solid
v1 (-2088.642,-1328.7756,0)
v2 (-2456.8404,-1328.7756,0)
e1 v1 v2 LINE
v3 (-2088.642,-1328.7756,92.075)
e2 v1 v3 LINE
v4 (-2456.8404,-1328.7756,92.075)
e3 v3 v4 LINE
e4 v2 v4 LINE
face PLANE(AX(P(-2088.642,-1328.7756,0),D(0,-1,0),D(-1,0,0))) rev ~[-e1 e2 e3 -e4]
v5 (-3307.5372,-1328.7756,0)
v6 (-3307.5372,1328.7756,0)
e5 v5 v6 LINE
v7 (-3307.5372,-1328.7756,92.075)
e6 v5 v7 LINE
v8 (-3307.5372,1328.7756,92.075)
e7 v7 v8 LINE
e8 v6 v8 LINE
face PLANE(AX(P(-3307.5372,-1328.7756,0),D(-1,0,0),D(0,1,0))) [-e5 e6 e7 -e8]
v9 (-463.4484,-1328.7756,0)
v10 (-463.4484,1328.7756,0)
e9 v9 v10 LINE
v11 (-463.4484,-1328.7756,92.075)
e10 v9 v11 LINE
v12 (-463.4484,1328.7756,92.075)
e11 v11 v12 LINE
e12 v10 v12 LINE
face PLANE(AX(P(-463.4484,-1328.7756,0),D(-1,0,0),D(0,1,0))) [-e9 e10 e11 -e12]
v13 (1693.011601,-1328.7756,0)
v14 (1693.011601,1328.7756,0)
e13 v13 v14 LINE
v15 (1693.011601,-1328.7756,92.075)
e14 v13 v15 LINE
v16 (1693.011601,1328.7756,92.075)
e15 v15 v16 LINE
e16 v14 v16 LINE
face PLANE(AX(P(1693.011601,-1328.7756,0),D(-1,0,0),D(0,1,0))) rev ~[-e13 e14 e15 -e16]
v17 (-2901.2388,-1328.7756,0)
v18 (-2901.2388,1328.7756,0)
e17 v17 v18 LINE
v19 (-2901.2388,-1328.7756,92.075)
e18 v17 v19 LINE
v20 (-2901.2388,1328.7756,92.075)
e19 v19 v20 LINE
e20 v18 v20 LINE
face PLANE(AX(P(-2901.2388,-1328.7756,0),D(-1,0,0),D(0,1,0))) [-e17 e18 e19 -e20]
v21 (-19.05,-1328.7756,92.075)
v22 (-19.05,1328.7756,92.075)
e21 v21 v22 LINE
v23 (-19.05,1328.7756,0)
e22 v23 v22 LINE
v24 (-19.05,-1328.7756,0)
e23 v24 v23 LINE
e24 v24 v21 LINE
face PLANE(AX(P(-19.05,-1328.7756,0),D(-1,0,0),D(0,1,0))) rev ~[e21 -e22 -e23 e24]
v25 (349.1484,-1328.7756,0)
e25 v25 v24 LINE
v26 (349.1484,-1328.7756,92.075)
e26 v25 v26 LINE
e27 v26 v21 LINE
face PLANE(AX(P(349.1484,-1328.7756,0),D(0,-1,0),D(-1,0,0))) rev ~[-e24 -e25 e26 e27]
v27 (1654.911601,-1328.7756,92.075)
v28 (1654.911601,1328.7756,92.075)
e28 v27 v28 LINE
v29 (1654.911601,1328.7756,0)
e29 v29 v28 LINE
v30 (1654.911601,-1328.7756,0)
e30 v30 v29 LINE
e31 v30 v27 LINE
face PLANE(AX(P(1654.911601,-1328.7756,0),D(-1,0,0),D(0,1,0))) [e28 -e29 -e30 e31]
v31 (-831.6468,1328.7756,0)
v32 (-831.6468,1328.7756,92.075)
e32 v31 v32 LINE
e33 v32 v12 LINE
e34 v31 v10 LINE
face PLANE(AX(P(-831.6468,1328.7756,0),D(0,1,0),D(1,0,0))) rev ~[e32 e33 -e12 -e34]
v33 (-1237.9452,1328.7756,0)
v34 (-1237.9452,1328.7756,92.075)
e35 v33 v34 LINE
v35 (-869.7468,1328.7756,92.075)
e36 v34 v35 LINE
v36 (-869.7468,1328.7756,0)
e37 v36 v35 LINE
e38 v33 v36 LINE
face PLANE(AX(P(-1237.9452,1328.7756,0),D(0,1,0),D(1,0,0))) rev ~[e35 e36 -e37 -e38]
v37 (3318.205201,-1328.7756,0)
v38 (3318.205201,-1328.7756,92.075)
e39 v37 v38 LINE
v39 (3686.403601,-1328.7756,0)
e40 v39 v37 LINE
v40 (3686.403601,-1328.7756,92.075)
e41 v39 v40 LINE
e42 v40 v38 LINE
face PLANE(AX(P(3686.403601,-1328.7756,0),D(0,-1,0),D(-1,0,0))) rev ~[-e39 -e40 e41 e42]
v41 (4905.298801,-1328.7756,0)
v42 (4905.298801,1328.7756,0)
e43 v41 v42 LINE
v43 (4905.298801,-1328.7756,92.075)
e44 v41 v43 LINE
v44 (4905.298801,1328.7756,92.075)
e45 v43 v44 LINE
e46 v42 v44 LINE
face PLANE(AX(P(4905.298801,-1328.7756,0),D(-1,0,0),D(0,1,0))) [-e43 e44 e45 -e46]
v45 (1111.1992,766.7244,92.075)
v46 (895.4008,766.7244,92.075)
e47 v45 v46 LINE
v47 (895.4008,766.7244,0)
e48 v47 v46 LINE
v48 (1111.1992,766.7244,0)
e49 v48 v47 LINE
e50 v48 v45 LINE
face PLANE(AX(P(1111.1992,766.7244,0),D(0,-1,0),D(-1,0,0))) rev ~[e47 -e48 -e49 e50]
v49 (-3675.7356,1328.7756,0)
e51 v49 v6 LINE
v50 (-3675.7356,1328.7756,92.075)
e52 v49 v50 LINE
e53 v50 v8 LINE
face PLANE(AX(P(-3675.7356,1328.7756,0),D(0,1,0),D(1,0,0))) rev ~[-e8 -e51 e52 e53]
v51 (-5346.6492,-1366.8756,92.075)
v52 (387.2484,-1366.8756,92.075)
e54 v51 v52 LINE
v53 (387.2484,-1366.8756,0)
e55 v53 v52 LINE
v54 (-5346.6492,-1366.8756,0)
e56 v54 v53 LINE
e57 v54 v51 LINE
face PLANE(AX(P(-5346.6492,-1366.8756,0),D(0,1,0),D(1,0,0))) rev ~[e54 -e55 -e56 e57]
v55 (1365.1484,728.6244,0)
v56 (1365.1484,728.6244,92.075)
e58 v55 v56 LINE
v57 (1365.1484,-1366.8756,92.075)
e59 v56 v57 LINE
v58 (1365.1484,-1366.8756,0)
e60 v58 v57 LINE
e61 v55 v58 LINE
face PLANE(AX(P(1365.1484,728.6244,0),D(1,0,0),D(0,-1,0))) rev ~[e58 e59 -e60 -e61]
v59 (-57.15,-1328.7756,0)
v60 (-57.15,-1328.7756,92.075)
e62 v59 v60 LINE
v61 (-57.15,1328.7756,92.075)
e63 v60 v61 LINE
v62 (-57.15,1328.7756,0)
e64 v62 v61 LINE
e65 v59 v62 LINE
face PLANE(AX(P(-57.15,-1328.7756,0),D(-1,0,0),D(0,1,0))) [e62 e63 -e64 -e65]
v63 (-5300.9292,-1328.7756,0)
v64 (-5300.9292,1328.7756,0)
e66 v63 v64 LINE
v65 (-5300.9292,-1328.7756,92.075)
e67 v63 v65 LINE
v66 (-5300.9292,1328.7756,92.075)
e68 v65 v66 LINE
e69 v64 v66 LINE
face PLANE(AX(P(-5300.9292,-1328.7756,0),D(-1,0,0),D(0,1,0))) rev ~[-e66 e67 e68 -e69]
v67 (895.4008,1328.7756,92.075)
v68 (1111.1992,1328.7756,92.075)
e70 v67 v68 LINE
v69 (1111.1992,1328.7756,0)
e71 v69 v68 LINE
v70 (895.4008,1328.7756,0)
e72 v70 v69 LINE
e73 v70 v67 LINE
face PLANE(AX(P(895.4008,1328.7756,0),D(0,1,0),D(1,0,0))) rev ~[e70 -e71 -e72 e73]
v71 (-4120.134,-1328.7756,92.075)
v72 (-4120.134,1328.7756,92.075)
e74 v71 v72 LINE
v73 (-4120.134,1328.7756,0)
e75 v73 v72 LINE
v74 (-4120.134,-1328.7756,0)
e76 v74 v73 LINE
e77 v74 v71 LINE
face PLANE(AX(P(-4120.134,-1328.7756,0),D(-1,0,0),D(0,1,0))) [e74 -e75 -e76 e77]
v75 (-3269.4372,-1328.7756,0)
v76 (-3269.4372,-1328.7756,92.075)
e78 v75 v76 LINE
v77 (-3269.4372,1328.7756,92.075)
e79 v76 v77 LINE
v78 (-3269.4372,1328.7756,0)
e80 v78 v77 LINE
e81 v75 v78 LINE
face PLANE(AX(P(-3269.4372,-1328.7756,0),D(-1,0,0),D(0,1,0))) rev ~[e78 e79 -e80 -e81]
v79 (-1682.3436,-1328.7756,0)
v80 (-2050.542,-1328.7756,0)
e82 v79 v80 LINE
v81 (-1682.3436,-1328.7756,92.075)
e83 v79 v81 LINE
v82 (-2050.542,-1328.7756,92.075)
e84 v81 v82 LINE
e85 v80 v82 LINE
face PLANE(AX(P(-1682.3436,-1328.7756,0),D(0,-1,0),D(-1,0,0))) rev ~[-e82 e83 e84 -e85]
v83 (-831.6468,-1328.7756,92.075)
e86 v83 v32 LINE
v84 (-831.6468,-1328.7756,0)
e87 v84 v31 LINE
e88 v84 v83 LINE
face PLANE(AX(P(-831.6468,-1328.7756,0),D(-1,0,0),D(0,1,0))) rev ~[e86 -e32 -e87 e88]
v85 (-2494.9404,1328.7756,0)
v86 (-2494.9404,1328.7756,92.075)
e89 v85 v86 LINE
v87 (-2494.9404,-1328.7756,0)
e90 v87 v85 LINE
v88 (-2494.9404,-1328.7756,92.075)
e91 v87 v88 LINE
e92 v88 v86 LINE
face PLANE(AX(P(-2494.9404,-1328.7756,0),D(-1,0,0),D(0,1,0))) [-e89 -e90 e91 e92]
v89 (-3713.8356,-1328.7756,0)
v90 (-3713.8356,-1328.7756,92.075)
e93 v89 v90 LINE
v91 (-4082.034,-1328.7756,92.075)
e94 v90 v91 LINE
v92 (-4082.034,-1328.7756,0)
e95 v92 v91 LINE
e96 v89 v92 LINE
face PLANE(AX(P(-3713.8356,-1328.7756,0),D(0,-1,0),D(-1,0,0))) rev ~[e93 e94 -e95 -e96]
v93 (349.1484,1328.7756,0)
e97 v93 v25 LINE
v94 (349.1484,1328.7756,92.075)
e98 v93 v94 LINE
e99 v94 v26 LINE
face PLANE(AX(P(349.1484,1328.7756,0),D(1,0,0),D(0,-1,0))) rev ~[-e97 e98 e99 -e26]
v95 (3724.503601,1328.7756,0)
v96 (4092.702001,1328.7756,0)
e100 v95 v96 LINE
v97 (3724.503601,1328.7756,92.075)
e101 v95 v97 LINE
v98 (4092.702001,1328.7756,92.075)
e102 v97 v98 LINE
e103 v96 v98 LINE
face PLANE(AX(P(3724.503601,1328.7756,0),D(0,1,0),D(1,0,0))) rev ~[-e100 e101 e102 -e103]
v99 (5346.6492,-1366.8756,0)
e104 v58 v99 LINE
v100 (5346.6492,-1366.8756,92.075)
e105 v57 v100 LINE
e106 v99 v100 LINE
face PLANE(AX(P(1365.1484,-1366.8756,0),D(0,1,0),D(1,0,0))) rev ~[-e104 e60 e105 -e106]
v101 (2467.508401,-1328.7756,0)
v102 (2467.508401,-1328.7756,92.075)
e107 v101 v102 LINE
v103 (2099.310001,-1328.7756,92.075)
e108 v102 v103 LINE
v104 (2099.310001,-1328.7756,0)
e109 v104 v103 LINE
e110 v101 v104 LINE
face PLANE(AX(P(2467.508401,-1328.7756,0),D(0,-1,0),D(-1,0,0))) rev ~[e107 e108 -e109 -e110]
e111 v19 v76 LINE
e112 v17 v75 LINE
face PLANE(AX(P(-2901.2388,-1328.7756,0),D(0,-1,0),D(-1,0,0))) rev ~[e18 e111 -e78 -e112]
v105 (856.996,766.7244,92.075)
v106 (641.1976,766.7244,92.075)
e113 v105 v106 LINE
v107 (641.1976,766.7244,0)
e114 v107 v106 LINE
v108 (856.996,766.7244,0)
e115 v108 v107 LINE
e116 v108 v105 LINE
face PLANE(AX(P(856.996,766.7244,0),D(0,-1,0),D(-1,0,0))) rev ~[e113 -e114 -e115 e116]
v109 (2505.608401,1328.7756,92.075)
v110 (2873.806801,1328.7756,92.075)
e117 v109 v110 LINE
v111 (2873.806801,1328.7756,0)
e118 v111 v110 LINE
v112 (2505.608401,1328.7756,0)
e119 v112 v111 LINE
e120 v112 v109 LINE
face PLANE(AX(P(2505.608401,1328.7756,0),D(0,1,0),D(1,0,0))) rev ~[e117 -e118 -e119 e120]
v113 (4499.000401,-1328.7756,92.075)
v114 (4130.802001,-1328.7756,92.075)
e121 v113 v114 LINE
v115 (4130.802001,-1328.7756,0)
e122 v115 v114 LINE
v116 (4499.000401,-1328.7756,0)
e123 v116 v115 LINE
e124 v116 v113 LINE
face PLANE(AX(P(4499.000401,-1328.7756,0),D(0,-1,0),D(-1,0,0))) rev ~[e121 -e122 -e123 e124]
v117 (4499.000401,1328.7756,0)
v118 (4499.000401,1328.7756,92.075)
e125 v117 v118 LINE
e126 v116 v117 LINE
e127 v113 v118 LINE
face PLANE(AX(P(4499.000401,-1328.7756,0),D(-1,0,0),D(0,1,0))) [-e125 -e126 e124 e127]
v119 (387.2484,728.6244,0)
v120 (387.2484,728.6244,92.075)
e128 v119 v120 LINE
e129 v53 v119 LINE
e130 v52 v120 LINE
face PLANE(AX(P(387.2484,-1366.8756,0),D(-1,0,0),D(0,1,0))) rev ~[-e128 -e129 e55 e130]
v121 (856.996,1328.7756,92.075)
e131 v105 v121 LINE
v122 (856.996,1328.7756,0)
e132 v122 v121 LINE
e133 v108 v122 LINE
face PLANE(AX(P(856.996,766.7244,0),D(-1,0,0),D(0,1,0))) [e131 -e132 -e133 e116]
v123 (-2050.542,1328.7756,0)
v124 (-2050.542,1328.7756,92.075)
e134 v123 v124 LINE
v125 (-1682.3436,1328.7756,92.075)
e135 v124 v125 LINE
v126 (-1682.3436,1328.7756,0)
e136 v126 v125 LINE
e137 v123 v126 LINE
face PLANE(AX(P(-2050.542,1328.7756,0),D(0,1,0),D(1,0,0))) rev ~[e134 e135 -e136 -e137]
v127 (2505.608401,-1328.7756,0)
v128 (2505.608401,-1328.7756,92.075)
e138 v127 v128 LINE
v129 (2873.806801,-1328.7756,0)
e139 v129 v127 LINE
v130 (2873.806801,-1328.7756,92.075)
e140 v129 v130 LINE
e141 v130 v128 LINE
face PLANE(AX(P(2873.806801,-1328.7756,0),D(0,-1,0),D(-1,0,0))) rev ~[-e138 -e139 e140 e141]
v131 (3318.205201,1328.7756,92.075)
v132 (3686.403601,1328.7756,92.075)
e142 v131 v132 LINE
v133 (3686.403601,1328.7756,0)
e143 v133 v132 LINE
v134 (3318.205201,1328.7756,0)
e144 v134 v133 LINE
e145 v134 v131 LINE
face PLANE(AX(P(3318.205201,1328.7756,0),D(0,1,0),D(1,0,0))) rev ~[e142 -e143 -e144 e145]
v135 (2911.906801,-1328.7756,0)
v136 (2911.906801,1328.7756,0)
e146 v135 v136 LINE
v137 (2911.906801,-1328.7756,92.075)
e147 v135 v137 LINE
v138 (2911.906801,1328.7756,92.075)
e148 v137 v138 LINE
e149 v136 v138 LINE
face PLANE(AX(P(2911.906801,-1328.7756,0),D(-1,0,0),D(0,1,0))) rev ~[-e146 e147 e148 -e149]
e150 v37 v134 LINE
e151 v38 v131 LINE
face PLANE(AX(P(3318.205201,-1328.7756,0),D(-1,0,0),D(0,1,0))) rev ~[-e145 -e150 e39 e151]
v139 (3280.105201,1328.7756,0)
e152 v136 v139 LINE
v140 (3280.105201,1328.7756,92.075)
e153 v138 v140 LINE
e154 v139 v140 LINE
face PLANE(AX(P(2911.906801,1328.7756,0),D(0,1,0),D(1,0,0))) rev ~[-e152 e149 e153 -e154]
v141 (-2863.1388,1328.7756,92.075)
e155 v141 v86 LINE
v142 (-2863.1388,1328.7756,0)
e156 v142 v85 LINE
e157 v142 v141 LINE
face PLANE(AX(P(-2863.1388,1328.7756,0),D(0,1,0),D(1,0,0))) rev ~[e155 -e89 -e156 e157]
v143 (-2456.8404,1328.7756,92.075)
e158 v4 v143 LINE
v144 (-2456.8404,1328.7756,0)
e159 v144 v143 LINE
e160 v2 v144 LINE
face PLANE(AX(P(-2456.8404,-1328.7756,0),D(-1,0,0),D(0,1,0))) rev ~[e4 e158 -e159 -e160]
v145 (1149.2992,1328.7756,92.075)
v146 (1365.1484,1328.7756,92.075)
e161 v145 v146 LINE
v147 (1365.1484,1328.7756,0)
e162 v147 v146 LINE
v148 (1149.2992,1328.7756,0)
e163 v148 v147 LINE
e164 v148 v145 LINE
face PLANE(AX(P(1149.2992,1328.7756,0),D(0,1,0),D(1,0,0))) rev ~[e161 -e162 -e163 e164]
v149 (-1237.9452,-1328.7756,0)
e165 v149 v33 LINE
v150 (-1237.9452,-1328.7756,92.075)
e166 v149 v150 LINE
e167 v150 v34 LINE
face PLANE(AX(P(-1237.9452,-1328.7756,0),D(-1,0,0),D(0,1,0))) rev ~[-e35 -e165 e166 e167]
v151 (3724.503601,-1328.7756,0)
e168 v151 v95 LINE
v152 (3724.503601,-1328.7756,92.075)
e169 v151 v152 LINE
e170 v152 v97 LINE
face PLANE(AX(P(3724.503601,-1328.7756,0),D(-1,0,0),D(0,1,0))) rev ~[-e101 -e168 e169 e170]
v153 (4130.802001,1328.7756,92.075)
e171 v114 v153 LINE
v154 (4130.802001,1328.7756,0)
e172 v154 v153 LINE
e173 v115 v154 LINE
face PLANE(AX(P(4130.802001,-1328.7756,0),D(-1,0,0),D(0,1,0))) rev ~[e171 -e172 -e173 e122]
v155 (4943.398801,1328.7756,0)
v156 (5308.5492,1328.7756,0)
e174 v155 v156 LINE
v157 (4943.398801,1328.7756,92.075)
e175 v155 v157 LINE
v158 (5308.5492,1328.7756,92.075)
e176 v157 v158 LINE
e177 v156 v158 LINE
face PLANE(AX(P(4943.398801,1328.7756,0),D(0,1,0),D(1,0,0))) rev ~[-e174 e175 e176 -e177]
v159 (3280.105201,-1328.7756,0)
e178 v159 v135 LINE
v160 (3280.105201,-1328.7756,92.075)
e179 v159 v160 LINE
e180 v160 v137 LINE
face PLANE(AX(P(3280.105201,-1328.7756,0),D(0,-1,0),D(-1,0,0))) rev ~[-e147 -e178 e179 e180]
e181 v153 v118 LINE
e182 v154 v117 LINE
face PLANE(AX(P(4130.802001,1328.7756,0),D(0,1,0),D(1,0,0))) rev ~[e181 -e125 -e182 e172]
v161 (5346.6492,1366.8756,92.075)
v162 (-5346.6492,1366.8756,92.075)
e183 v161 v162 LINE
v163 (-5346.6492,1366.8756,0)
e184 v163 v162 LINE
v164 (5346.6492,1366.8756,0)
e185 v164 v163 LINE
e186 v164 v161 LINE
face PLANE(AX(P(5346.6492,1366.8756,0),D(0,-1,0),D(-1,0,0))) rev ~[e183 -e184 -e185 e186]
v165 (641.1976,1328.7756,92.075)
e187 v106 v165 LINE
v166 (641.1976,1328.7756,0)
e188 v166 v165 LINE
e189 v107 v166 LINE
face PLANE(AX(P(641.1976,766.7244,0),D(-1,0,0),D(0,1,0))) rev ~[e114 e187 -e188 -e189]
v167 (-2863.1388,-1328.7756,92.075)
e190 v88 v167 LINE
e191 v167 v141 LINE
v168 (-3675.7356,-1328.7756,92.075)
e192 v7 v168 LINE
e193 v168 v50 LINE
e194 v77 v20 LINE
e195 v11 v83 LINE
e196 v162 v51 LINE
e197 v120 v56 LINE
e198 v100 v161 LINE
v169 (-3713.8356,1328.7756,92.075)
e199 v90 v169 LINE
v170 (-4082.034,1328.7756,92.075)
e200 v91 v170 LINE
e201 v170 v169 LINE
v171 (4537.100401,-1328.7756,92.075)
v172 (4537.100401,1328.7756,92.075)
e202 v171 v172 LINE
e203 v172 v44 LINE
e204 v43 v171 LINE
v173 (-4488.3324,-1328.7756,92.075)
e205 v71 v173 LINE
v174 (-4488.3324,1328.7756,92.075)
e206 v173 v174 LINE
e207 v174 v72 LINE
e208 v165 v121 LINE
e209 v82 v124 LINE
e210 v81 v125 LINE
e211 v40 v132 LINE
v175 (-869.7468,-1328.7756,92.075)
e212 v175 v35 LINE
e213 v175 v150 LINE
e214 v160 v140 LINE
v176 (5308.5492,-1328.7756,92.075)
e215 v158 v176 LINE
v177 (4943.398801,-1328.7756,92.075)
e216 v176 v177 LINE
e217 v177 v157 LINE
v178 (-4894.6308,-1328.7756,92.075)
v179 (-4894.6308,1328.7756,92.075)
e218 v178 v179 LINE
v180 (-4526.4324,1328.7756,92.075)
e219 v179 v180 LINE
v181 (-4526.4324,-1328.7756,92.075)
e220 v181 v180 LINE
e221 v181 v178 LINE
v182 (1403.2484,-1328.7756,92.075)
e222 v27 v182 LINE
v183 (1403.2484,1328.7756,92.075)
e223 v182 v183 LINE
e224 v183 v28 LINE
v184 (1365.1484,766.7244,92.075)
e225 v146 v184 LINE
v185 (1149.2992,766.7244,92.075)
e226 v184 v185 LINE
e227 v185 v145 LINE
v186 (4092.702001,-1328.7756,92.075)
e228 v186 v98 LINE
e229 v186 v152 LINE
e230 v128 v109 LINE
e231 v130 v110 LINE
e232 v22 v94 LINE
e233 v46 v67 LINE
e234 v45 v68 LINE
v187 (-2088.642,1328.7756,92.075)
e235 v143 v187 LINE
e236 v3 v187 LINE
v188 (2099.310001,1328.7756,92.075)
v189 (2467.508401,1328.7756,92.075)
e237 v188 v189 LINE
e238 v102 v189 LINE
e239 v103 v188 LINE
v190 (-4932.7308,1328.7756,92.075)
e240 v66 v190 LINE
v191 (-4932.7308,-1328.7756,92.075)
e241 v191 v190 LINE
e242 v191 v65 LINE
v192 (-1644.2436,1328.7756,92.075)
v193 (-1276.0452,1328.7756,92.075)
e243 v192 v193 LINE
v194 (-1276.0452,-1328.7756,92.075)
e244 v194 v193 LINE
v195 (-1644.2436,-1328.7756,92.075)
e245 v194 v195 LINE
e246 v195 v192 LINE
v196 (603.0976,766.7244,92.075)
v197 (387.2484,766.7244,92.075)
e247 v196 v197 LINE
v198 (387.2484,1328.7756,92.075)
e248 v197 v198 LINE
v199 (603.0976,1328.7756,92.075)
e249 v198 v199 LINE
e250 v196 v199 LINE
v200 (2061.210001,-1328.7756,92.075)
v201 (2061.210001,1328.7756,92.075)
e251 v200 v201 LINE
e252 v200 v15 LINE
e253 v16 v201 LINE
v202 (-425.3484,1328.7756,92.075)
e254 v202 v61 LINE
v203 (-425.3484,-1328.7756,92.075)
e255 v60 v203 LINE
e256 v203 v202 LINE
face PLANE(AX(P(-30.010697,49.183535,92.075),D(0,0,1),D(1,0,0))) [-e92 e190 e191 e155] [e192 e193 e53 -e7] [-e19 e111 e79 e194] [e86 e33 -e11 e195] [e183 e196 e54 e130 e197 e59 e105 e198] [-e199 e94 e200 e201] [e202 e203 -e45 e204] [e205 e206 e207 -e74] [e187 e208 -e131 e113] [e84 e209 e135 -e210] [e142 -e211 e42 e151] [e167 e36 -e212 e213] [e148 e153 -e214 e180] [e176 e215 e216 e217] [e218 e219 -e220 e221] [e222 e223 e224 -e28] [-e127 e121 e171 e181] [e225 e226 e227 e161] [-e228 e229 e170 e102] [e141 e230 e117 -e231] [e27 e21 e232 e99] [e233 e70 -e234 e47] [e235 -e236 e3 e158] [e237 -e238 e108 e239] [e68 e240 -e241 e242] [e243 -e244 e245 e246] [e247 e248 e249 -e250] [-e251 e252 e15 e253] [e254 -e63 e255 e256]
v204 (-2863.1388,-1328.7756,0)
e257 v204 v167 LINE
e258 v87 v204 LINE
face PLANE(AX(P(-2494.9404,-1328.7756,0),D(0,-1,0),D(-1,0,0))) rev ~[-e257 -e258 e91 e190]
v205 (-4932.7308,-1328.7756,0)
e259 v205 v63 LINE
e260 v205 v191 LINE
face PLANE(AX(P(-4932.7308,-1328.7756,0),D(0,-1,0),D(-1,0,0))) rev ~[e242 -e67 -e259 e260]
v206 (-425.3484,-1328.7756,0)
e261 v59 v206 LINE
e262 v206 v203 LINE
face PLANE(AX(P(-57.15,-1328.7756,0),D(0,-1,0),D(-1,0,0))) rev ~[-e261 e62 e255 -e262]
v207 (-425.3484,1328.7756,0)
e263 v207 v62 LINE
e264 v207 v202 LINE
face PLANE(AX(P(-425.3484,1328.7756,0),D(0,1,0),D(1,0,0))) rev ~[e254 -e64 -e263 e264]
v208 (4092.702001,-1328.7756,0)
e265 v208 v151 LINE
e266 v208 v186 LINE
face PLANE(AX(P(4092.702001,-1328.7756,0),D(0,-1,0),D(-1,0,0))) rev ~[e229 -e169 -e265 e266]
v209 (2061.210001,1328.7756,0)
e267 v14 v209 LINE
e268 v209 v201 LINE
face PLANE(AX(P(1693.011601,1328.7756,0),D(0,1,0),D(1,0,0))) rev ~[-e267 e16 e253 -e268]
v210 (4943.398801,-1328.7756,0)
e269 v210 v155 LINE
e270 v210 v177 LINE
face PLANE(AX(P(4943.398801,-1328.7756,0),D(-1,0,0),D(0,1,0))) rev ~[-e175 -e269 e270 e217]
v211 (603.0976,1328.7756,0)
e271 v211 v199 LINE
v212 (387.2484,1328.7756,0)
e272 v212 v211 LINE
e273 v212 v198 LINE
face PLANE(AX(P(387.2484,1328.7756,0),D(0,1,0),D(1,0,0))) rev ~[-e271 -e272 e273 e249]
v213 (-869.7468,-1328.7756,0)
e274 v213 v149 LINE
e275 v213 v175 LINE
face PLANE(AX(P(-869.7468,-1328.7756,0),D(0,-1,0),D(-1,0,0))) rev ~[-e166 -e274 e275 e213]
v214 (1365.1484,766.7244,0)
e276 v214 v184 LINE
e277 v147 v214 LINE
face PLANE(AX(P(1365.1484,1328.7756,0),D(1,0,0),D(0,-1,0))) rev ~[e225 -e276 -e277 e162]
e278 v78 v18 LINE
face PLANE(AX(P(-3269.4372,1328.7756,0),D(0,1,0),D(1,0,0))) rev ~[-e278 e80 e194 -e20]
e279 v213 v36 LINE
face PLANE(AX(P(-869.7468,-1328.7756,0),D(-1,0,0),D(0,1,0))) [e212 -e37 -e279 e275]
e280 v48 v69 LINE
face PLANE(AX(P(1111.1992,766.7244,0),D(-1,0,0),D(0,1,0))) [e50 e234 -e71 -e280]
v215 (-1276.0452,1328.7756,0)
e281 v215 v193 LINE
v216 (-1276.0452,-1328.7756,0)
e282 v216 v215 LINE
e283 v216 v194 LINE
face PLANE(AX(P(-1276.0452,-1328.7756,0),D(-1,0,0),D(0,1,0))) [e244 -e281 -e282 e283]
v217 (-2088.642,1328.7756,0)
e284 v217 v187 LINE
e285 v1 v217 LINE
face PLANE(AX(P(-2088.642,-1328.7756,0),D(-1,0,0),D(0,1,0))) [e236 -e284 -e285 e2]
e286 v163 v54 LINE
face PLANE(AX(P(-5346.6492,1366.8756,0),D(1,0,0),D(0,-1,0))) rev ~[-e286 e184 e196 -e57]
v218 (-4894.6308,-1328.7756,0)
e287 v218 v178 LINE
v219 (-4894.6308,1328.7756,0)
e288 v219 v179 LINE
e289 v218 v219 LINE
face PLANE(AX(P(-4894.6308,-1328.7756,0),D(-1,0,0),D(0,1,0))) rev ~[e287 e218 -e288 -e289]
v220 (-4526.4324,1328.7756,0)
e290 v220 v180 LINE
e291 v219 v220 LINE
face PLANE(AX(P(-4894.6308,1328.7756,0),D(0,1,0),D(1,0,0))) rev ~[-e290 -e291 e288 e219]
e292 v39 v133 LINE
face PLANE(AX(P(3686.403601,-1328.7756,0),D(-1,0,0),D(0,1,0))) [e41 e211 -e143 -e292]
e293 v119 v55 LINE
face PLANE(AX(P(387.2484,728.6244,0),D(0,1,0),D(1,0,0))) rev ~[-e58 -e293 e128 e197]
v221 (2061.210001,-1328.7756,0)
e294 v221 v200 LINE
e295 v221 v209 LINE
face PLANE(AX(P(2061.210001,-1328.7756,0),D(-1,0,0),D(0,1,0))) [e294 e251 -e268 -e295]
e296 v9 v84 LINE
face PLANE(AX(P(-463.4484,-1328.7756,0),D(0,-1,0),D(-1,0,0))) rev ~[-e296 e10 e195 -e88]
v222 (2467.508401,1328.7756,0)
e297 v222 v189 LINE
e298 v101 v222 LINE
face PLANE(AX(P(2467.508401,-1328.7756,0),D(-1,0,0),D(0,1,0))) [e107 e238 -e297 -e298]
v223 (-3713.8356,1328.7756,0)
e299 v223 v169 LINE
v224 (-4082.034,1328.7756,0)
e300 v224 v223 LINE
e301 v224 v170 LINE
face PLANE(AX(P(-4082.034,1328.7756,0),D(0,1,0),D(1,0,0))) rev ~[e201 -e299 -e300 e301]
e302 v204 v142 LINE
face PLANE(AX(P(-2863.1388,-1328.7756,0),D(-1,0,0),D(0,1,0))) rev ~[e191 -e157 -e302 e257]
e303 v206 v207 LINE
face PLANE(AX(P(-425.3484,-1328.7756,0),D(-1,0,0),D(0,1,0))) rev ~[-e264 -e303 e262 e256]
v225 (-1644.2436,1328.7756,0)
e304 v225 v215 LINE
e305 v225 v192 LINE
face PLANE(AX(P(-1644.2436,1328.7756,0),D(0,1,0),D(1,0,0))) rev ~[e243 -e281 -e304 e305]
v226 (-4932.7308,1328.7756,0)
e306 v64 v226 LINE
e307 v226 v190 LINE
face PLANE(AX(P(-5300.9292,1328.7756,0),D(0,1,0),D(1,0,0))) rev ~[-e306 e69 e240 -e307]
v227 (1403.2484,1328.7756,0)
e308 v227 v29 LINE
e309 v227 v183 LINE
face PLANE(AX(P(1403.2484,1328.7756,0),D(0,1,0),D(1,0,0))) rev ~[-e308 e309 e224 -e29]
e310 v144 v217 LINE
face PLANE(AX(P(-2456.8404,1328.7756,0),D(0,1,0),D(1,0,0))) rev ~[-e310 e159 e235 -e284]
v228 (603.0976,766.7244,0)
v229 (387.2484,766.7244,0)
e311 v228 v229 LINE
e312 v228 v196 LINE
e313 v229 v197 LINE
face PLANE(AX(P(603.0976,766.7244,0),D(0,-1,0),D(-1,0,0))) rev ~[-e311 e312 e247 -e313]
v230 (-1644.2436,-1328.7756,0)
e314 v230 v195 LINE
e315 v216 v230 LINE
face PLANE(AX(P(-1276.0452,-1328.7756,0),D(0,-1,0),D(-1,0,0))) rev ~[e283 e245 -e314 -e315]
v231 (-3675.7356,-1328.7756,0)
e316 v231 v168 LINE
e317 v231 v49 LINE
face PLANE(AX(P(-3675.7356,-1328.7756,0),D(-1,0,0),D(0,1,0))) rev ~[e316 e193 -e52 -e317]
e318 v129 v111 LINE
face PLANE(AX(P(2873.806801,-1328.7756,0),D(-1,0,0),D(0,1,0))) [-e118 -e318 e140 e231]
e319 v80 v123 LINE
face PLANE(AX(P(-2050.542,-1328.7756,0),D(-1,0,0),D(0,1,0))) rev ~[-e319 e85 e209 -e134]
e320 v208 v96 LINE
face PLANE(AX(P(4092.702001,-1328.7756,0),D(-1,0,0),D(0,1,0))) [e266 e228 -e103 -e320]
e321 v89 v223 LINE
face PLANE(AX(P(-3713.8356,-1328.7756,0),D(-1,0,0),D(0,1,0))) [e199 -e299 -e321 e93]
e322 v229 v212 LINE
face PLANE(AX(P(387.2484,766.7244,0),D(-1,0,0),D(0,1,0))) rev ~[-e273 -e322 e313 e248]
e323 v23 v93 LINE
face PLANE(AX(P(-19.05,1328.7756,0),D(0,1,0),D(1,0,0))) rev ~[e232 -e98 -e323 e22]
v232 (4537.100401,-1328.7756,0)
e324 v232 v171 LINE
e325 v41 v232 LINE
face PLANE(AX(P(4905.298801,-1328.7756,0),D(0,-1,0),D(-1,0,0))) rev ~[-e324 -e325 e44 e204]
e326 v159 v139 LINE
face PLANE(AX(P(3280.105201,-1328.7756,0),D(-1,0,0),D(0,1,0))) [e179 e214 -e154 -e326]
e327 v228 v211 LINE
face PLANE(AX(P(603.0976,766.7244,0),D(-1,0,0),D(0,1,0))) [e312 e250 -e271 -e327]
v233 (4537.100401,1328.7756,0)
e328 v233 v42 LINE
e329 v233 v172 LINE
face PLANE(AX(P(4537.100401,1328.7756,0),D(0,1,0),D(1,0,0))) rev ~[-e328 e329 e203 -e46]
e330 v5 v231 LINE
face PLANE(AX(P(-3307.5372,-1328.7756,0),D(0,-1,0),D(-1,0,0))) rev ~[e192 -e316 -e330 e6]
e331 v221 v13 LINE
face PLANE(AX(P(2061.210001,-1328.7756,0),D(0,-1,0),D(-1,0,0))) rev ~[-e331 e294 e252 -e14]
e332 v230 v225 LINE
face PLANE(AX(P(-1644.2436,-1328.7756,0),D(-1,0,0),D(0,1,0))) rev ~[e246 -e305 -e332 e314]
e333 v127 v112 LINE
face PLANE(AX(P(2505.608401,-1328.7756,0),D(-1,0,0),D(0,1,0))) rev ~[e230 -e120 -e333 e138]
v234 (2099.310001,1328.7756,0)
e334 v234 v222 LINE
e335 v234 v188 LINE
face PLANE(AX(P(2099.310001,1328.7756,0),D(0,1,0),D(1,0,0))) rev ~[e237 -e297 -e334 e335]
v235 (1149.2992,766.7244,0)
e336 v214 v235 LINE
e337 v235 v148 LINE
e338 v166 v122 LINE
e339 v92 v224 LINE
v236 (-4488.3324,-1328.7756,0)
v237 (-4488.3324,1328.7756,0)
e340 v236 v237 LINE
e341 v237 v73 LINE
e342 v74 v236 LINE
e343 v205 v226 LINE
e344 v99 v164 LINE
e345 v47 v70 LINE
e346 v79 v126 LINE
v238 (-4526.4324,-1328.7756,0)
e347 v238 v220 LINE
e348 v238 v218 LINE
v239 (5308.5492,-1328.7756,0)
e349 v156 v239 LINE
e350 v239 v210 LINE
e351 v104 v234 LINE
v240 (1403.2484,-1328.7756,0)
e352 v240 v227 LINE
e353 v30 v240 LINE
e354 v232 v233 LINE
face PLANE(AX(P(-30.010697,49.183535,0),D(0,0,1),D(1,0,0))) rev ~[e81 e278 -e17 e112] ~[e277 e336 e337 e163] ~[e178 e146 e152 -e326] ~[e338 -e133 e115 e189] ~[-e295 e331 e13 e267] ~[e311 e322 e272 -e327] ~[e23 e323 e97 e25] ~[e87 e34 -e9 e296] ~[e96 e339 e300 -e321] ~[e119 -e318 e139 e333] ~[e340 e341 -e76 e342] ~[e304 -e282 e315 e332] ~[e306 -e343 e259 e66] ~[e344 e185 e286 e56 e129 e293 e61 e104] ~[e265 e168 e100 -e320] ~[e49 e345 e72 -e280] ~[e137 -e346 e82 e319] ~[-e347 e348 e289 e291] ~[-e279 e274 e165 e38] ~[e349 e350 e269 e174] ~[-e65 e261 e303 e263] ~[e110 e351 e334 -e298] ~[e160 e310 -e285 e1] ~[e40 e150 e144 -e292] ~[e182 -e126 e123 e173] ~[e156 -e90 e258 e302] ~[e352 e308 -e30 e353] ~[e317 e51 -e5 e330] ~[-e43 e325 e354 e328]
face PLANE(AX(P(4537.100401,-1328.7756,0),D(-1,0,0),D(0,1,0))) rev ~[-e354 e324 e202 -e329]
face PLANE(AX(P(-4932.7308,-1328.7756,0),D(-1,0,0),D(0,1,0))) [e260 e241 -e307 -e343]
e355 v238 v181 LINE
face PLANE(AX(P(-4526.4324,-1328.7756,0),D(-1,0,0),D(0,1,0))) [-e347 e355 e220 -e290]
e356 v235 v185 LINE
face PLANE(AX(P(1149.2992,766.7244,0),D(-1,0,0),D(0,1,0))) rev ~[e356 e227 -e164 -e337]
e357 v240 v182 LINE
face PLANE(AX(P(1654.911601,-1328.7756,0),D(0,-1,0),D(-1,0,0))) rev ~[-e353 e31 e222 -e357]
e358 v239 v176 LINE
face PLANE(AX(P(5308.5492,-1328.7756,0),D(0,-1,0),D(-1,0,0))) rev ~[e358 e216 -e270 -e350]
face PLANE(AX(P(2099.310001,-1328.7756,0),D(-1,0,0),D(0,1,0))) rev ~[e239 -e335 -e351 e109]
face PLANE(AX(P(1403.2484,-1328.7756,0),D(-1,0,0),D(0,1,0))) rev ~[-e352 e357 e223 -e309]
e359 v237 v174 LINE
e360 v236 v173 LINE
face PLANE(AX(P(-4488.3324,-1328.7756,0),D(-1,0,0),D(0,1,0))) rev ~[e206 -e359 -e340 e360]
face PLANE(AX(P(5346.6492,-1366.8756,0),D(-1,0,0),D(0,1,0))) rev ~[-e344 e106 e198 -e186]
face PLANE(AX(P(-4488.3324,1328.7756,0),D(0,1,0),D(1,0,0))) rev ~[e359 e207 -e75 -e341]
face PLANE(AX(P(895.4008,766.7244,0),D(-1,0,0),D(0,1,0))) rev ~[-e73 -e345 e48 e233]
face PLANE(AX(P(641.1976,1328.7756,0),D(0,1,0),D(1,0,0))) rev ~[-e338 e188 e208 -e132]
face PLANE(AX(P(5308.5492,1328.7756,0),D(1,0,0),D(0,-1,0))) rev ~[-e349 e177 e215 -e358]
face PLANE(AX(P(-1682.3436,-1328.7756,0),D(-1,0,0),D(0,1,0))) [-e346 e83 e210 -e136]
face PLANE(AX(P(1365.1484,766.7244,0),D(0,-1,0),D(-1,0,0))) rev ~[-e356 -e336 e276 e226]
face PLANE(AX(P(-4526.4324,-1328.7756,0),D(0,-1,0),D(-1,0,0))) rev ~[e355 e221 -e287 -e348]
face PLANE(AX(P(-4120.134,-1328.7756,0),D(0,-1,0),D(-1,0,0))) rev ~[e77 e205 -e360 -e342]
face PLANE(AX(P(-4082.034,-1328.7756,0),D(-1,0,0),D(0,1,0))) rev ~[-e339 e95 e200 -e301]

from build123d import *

# Parameters (mm, degrees)
F0_W     = 38.1
F0_H     = 2657.5512
F0_H_2   = 562.0512
F0_W_2   = 38.4048
F1_DEPTH = 92.075


# Not quite as in the source:
# - a feature names something its author has since deleted; it is built from what else it names


with BuildPart() as f1:
    # F0 (on Top) → F1 (new body)
    with BuildSketch(Plane.XY):
        Polygon((1365.1484, -1366.8756), (5346.6492, -1366.8756), (5346.6492, 1366.8756), (-5346.6492, 1366.8756), (-5346.6492, -1366.8756), (387.2484, -1366.8756), (387.2484, -1328.7756), (349.1484, -1328.7756), (-19.05, -1328.7756), (-57.15, -1328.7756), (-425.3484, -1328.7756), (-463.4484, -1328.7756), (-831.6468, -1328.7756), (-869.7468, -1328.7756), (-1237.9452, -1328.7756), (-1276.0452, -1328.7756), (-1644.2436, -1328.7756), (-1682.3436, -1328.7756), (-2050.542, -1328.7756), (-2088.642, -1328.7756), (-2456.8404, -1328.7756), (-2494.9404, -1328.7756), (-2863.1388, -1328.7756), (-2901.2388, -1328.7756), (-3269.4372, -1328.7756), (-3307.5372, -1328.7756), (-3675.7356, -1328.7756), (-3713.8356, -1328.7756), (-4082.034, -1328.7756), (-4120.134, -1328.7756), (-4488.3324, -1328.7756), (-4526.4324, -1328.7756), (-4894.6308, -1328.7756), (-4932.7308, -1328.7756), (-5300.9292, -1328.7756), (-5300.9292, 1328.7756), (-4932.7308, 1328.7756), (-4894.6308, 1328.7756), (-4526.4324, 1328.7756), (-4488.3324, 1328.7756), (-4120.134, 1328.7756), (-4082.034, 1328.7756), (-3713.8356, 1328.7756), (-3675.7356, 1328.7756), (-3307.5372, 1328.7756), (-3269.4372, 1328.7756), (-2901.2388, 1328.7756), (-2863.1388, 1328.7756), (-2494.9404, 1328.7756), (-2456.8404, 1328.7756), (-2088.642, 1328.7756), (-2050.542, 1328.7756), (-1682.3436, 1328.7756), (-1644.2436, 1328.7756), (-1276.0452, 1328.7756), (-1237.9452, 1328.7756), (-869.7468, 1328.7756), (-831.6468, 1328.7756), (-463.4484, 1328.7756), (-425.3484, 1328.7756), (-57.15, 1328.7756), (-19.05, 1328.7756), (349.1484, 1328.7756), (387.2484, 1328.7756), (603.0976, 1328.7756), (641.1976, 1328.7756), (856.996, 1328.7756), (895.4008, 1328.7756), (1111.1992, 1328.7756), (1149.2992, 1328.7756), (1365.1484, 1328.7756), (1403.2484, 1328.7756), (1654.911601016, 1328.7756), (1693.011601016, 1328.7756), (2061.210001016, 1328.7756), (2099.310001016, 1328.7756), (2467.508401016, 1328.7756), (2505.608401016, 1328.7756), (2873.806801016, 1328.7756), (2911.906801016, 1328.7756), (3280.105201016, 1328.7756), (3318.205201016, 1328.7756), (3686.403601016, 1328.7756), (3724.503601016, 1328.7756), (4092.702001016, 1328.7756), (4130.802001016, 1328.7756), (4499.000401016, 1328.7756), (4537.100401016, 1328.7756), (4905.298801016, 1328.7756), (4943.398801016, 1328.7756), (5308.5492, 1328.7756), (5308.5492, -1328.7756), (4943.398801016, -1328.7756), (4905.298801016, -1328.7756), (4537.100401016, -1328.7756), (4499.000401016, -1328.7756), (4130.802001016, -1328.7756), (4092.702001016, -1328.7756), (3724.503601016, -1328.7756), (3686.403601016, -1328.7756), (3318.205201016, -1328.7756), (3280.105201016, -1328.7756), (2911.906801016, -1328.7756), (2873.806801016, -1328.7756), (2505.608401016, -1328.7756), (2467.508401016, -1328.7756), (2099.310001016, -1328.7756), (2061.210001016, -1328.7756), (1693.011601016, -1328.7756), (1654.911601016, -1328.7756), (1403.2484, -1328.7756), (1365.1484, -1328.7756), align=None)
        with Locations((-4913.6808, 0)):
            Rectangle(F0_W, F0_H)
        with Locations((-4507.3824, 0)):
            Rectangle(F0_W, F0_H)
        with Locations((-4101.084, 0)):
            Rectangle(F0_W, F0_H)
        with Locations((-3694.7856, 0)):
            Rectangle(F0_W, F0_H)
        with Locations((-3288.4872, 0)):
            Rectangle(F0_W, F0_H)
        with Locations((-2882.1888, 0)):
            Rectangle(F0_W, F0_H)
        with Locations((-2475.8904, 0)):
            Rectangle(F0_W, F0_H)
        with Locations((-2069.592, 0)):
            Rectangle(F0_W, F0_H)
        with Locations((-1663.2936, 0)):
            Rectangle(F0_W, F0_H)
        with Locations((-1256.9952, 0)):
            Rectangle(F0_W, F0_H)
        with Locations((-850.6968, 0)):
            Rectangle(F0_W, F0_H)
        with Locations((-444.3984, 0)):
            Rectangle(F0_W, F0_H)
        Polygon((349.1484, -1328.7756), (387.2484, -1328.7756), (387.2484, 728.6244), (387.2484, 766.7244), (387.2484, 1328.7756), (349.1484, 1328.7756), align=None)
        Polygon((387.2484, 728.6244), (1365.1484, 728.6244), (1365.1484, 766.7244), (1149.2992, 766.7244), (1111.1992, 766.7244), (895.4008, 766.7244), (856.996, 766.7244), (641.1976, 766.7244), (603.0976, 766.7244), (387.2484, 766.7244), align=None)
        with Locations((622.1476, 1047.75)):
            Rectangle(F0_W, F0_H_2)
        with Locations((876.1984, 1047.75)):
            Rectangle(F0_W_2, F0_H_2)
        with Locations((1130.2492, 1047.75)):
            Rectangle(F0_W, F0_H_2)
        Polygon((1365.1484, 728.6244), (1365.1484, -1328.7756), (1403.2484, -1328.7756), (1403.2484, 1328.7756), (1365.1484, 1328.7756), (1365.1484, 766.7244), align=None)
        with Locations((1673.961601016, 0)):
            Rectangle(F0_W, F0_H)
        with Locations((2080.260001016, 0)):
            Rectangle(F0_W, F0_H)
        with Locations((2486.558401016, 0)):
            Rectangle(F0_W, F0_H)
        with Locations((2892.856801016, 0)):
            Rectangle(F0_W, F0_H)
        with Locations((3299.155201016, 0)):
            Rectangle(F0_W, F0_H)
        with Locations((3705.453601016, 0)):
            Rectangle(F0_W, F0_H)
        with Locations((4111.752001016, 0)):
            Rectangle(F0_W, F0_H)
        with Locations((4518.050401016, 0)):
            Rectangle(F0_W, F0_H)
        with Locations((4924.348801016, 0)):
            Rectangle(F0_W, F0_H)
        with Locations((-38.1, 0)):
            Rectangle(F0_W, F0_H)
    extrude(amount=F1_DEPTH)


solid = f1.part
